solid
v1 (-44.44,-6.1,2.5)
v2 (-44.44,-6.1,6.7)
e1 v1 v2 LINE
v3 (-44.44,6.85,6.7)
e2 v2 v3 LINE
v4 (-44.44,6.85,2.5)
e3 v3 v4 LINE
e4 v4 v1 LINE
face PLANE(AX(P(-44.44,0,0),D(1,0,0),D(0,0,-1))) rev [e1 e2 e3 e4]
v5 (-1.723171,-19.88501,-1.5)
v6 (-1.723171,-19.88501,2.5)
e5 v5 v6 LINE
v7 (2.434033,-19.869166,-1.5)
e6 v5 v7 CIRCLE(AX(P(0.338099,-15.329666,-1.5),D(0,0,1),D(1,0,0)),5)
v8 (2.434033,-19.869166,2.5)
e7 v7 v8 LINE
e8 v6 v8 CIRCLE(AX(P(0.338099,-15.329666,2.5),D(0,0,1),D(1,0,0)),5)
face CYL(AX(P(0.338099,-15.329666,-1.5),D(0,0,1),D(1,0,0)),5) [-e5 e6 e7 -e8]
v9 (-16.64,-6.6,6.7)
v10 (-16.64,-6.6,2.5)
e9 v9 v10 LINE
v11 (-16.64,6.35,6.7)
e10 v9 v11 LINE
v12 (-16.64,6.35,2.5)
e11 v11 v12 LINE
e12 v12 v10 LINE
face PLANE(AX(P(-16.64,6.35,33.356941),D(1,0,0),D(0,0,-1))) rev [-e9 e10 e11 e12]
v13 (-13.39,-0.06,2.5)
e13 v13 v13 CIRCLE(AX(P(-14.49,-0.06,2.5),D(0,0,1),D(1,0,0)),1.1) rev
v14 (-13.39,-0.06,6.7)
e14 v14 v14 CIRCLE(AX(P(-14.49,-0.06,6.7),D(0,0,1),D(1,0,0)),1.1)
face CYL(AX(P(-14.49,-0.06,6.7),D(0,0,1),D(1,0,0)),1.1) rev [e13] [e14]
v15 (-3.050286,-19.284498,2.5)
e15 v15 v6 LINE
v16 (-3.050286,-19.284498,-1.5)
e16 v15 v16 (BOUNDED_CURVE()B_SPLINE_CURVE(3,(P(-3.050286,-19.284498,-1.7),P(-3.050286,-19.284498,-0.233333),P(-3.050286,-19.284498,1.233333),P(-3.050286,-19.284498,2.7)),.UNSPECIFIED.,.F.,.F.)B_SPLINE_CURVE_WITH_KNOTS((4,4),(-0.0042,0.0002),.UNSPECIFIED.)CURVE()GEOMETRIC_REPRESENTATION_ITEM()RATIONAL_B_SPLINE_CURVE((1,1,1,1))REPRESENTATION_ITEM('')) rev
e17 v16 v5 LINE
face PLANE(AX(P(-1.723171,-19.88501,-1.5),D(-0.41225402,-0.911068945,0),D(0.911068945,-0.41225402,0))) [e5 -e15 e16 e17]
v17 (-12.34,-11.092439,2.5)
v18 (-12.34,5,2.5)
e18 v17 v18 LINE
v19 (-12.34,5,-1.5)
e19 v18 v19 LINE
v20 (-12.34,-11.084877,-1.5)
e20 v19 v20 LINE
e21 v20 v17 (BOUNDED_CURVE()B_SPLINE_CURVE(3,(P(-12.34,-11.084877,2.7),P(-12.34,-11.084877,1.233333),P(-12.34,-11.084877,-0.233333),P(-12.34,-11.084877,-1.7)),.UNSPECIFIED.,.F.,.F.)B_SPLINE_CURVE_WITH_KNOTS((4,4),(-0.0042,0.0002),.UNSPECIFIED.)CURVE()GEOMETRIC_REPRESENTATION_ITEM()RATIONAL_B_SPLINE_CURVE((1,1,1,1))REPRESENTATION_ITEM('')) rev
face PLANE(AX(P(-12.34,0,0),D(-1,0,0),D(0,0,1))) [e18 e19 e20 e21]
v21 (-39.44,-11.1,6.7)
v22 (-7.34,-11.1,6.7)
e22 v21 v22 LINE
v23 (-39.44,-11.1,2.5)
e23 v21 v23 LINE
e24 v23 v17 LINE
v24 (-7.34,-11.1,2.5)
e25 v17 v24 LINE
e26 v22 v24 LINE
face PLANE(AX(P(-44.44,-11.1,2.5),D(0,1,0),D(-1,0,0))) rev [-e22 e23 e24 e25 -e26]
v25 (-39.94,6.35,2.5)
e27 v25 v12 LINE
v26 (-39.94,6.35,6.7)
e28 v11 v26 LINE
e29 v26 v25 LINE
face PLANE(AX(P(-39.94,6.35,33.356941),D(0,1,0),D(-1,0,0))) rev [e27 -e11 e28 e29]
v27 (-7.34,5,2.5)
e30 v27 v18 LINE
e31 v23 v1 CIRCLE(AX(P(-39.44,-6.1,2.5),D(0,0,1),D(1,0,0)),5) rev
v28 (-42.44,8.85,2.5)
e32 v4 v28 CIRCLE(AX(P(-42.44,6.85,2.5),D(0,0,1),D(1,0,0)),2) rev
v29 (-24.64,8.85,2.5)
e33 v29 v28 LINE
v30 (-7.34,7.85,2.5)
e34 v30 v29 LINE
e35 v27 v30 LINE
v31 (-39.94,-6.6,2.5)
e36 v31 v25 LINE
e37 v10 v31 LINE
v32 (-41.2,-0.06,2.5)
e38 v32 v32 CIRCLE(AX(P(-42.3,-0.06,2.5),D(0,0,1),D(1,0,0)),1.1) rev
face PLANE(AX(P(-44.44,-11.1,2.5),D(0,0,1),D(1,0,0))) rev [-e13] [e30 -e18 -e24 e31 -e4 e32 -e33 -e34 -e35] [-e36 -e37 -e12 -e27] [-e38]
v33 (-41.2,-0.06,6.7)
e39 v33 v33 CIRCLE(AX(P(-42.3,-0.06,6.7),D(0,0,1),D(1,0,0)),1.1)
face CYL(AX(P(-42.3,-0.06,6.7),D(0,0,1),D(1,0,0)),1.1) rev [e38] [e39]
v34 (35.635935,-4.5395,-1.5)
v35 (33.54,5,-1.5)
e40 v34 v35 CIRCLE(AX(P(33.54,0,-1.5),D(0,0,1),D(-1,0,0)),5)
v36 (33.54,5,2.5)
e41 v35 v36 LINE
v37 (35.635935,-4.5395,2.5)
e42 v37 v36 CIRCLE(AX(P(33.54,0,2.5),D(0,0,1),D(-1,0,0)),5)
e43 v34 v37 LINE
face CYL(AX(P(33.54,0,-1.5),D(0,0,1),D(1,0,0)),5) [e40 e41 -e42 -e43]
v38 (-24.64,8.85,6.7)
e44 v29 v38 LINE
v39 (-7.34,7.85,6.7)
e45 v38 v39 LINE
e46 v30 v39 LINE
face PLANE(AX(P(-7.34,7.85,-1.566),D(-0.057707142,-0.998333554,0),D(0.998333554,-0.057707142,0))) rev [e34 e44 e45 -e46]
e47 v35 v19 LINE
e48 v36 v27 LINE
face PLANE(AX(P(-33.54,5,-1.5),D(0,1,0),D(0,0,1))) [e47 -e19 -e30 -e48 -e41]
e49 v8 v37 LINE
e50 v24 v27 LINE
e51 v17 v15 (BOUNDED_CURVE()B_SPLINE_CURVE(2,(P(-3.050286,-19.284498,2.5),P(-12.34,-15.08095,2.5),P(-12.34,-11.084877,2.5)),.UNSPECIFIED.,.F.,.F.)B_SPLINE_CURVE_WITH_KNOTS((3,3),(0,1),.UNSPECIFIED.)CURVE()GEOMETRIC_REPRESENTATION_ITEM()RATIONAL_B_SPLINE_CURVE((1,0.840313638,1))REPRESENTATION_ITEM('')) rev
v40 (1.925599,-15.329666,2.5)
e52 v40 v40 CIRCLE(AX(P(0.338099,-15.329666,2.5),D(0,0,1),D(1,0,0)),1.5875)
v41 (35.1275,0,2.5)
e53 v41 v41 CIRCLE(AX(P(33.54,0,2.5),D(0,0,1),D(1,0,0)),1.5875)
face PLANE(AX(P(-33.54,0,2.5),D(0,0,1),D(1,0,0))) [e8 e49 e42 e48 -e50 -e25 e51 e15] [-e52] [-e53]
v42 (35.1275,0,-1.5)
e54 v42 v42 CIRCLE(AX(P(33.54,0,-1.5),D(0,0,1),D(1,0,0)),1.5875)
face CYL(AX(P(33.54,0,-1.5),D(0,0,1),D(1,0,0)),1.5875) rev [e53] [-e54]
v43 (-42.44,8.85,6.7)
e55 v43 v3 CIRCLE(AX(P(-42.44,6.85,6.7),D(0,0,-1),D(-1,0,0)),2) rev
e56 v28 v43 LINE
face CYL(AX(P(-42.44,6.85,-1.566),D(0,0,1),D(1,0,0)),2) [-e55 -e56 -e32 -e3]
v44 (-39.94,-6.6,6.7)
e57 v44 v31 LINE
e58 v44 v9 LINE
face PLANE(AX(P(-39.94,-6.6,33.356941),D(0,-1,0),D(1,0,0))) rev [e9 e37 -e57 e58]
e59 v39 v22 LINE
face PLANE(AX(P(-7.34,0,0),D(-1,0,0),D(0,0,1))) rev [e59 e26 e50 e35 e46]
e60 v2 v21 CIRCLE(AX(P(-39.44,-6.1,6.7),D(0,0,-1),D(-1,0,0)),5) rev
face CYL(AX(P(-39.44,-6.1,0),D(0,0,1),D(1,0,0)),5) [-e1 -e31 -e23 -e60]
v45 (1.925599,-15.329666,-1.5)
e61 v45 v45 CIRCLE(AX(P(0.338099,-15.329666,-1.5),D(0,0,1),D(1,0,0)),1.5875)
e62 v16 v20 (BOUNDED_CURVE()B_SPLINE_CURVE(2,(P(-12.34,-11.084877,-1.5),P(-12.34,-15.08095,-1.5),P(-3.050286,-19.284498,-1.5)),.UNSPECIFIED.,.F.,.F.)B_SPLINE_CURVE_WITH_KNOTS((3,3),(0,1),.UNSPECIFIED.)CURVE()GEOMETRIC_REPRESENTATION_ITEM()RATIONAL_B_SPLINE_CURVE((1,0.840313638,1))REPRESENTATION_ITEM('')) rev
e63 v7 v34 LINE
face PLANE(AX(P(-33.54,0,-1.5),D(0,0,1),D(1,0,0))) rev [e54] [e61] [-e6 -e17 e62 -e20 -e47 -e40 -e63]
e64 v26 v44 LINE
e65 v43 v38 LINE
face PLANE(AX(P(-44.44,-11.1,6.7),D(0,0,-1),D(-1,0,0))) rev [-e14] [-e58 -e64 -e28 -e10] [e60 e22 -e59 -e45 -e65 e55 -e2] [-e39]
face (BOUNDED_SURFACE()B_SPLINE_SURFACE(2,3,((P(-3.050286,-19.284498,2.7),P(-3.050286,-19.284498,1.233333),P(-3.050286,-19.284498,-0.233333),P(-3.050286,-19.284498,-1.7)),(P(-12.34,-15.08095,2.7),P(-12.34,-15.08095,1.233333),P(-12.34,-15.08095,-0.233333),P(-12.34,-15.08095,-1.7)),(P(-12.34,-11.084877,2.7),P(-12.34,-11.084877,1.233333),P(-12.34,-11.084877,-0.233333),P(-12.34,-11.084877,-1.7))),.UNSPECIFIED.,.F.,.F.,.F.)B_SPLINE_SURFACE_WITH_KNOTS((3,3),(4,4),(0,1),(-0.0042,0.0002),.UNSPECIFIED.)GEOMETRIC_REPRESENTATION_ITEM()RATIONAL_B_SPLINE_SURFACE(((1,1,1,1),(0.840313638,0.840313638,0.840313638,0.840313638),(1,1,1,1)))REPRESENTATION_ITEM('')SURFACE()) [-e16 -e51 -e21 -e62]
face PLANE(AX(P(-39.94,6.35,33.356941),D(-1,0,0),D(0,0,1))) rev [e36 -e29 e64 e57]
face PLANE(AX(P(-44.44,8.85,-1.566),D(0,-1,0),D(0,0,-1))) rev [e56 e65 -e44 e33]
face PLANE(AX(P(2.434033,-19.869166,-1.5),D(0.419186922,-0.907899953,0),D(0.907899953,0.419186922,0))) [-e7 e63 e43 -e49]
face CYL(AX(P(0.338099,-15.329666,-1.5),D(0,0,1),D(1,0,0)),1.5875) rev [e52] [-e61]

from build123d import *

# Parameters (mm, degrees)
BOSS_EXTRUDE1_DEPTH      = 2.5
BOSS_EXTRUDE1_DEPTH_BACK = 1.5
SKETCH2_R                = 1.5875
CUT_EXTRUDE1_DEPTH       = 44.756449915
CUT_EXTRUDE3_DEPTH       = 59.296841331
SKETCH4_W                = 4.2
SKETCH4_H                = 22.2
BOSS_EXTRUDE2_DEPTH      = 32.1
SKETCH6_W                = 23.3
SKETCH6_H                = 12.95
CUT_EXTRUDE4_DEPTH       = 4.2
SKETCH7_W                = 4.2
SKETCH7_H                = 22.2
BOSS_EXTRUDE3_DEPTH      = 5
CUT_EXTRUDE5_DEPTH       = 3.7
FILLET1_R                = 5
F_2_0MM_DOWEL_HOLE1_D    = 2.2
SKETCH12_W               = 37.1
SKETCH12_H               = 2.25
CUT_EXTRUDE6_DEPTH       = 4.2
FILLET3_R                = 2
CUT_EXTRUDE7_REACH       = 51.552


with BuildPart() as part:
    # Sketch1 → Boss-Extrude1 (new, two sides: drawn at the far end of the back side and taken through both)
    with BuildSketch(Plane.XY.offset(-BOSS_EXTRUDE1_DEPTH_BACK)):
        with BuildLine():
            Line((-33.54, 5), (33.54, 5))
            ThreePointArc((33.54, 5), (38.423518139, 1.072963462), (35.635934611, -4.539499764))
            Line((35.635934611, -4.539499764), (2.434033336, -19.869165506))
            ThreePointArc((2.434033336, -19.869165506), (0.357155817, -20.329629424), (-1.723171376, -19.885010467))
            Line((-1.723171376, -19.885010467), (-35.601270101, -4.555344726))
            ThreePointArc((-35.601270101, -4.555344726), (-38.42757218, 1.054342537), (-33.54, 5))
        make_face()
    extrude(amount=BOSS_EXTRUDE1_DEPTH + BOSS_EXTRUDE1_DEPTH_BACK)

    # Sketch2 → Cut-Extrude1 (cut, through all)
    with BuildSketch(Plane.XY.offset(2.5)):
        with Locations((-33.54, 0)):
            Circle(SKETCH2_R)
        with Locations((33.54, 0)):
            Circle(SKETCH2_R)
        with Locations((0.338098725, -15.329665742)):
            Circle(SKETCH2_R)
    extrude(amount=-CUT_EXTRUDE1_DEPTH, mode=Mode.SUBTRACT)

    # Sketch3 → Cut-Extrude3 (cut, through all)
    with BuildSketch(Plane.ZY.offset(16.04)):
        Polygon((-1.5, -4.555344726), (-1.5, -19.885010467), (2.5, -19.885010467), (2.5, -4.555344726), (2.5, 5), (-1.5, 5), align=None)
    extrude(amount=CUT_EXTRUDE3_DEPTH, mode=Mode.SUBTRACT)

    # Sketch4 → Boss-Extrude2 (add)
    with BuildSketch(Plane.ZY.offset(12.34)):
        with Locations((4.6, 0)):
            Rectangle(SKETCH4_W, SKETCH4_H)
    extrude(amount=BOSS_EXTRUDE2_DEPTH)

    # Sketch6 → Cut-Extrude4 (cut)
    with BuildSketch(Plane(origin=(0, 0, 2.5), x_dir=(-1, 0, 0), z_dir=(0, 0, -1))):
        with Locations((28.29, -0.125)):
            Rectangle(SKETCH6_W, SKETCH6_H)
    extrude(amount=-CUT_EXTRUDE4_DEPTH, mode=Mode.SUBTRACT)

    # Sketch7 → Boss-Extrude3 (add)
    with BuildSketch(Plane(origin=(-12.34, 0, 0), x_dir=(0, 0, -1), z_dir=(1, 0, 0))):
        with Locations((-4.6, 0)):
            Rectangle(SKETCH7_W, SKETCH7_H)
    extrude(amount=BOSS_EXTRUDE3_DEPTH)

    # Sketch8 → Cut-Extrude5 (cut)
    with BuildSketch(Plane.ZY.offset(12.34)):
        Polygon((2.5, -13.406719018), (2.5, -11.1), (2.5, 5), (-1.5, 5), (-1.5, -13.406719018), (-1.5, -19.885010467), (2.5, -19.885010467), align=None)
    extrude(amount=CUT_EXTRUDE5_DEPTH, mode=Mode.SUBTRACT)

    # Fillet1
    fillet1_edges = [part.edges().sort_by_distance(p)[0] for p in [
        (-44.44, -11.1, 4.6),
    ]]
    fillet(fillet1_edges, radius=FILLET1_R)

    # Fillet2
    # a fillet whose section is not a circle: 13, 9 mm, written as the material it takes off along each edge
    with BuildSketch(Plane(origin=(-12.34, -15.080950022, 2.5), x_dir=(0, 1, 0), z_dir=(0, 0, -1))) as fillet2_piece_1:
        with BuildLine():
            Bezier((3.996072697, 0), (0, 0), (-4.203547809, 9.289713818), weights=[1, 0.840313638, 1])
            Line((-4.203547809, 9.289713818), (0, 0))
            Line((0, 0), (3.996072697, 0))
        make_face()
    extrude(amount=29.491248131, mode=Mode.SUBTRACT)

    # Ø2.0mm Dowel Hole1 (through all)
    with Locations(Plane.XY.offset(6.7)):
        with Locations((-42.3, -0.06), (-14.49, -0.06)):
            Hole(F_2_0MM_DOWEL_HOLE1_D / 2)

    # Sketch12 → Cut-Extrude6 (cut)
    with BuildSketch(Plane.XY.offset(6.7)):
        with Locations((-25.89, 9.975)):
            Rectangle(SKETCH12_W, SKETCH12_H)
    extrude(amount=-CUT_EXTRUDE6_DEPTH, mode=Mode.SUBTRACT)

    # Fillet3
    fillet3_edges = [part.edges().sort_by_distance(p)[0] for p in [
        (-44.44, 8.85, 4.6),
    ]]
    fillet(fillet3_edges, radius=FILLET3_R)

    # Sketch13 → Cut-Extrude7 (cut, up to next)
    with BuildSketch(Plane.XY.offset(6.7), mode=Mode.PRIVATE) as cut_extrude7_sk1:
        Polygon((-7.34, 8.85), (-7.34, 7.85), (-24.64, 8.85), align=None)
    cut_extrude7_tool1 = extrude(cut_extrude7_sk1.sketch, amount=-CUT_EXTRUDE7_REACH, mode=Mode.PRIVATE) & part.part
    add(cut_extrude7_tool1.solids().sort_by_distance((-13.106667, 8.516667, 6.7))[0], mode=Mode.SUBTRACT)


solid = part.part
